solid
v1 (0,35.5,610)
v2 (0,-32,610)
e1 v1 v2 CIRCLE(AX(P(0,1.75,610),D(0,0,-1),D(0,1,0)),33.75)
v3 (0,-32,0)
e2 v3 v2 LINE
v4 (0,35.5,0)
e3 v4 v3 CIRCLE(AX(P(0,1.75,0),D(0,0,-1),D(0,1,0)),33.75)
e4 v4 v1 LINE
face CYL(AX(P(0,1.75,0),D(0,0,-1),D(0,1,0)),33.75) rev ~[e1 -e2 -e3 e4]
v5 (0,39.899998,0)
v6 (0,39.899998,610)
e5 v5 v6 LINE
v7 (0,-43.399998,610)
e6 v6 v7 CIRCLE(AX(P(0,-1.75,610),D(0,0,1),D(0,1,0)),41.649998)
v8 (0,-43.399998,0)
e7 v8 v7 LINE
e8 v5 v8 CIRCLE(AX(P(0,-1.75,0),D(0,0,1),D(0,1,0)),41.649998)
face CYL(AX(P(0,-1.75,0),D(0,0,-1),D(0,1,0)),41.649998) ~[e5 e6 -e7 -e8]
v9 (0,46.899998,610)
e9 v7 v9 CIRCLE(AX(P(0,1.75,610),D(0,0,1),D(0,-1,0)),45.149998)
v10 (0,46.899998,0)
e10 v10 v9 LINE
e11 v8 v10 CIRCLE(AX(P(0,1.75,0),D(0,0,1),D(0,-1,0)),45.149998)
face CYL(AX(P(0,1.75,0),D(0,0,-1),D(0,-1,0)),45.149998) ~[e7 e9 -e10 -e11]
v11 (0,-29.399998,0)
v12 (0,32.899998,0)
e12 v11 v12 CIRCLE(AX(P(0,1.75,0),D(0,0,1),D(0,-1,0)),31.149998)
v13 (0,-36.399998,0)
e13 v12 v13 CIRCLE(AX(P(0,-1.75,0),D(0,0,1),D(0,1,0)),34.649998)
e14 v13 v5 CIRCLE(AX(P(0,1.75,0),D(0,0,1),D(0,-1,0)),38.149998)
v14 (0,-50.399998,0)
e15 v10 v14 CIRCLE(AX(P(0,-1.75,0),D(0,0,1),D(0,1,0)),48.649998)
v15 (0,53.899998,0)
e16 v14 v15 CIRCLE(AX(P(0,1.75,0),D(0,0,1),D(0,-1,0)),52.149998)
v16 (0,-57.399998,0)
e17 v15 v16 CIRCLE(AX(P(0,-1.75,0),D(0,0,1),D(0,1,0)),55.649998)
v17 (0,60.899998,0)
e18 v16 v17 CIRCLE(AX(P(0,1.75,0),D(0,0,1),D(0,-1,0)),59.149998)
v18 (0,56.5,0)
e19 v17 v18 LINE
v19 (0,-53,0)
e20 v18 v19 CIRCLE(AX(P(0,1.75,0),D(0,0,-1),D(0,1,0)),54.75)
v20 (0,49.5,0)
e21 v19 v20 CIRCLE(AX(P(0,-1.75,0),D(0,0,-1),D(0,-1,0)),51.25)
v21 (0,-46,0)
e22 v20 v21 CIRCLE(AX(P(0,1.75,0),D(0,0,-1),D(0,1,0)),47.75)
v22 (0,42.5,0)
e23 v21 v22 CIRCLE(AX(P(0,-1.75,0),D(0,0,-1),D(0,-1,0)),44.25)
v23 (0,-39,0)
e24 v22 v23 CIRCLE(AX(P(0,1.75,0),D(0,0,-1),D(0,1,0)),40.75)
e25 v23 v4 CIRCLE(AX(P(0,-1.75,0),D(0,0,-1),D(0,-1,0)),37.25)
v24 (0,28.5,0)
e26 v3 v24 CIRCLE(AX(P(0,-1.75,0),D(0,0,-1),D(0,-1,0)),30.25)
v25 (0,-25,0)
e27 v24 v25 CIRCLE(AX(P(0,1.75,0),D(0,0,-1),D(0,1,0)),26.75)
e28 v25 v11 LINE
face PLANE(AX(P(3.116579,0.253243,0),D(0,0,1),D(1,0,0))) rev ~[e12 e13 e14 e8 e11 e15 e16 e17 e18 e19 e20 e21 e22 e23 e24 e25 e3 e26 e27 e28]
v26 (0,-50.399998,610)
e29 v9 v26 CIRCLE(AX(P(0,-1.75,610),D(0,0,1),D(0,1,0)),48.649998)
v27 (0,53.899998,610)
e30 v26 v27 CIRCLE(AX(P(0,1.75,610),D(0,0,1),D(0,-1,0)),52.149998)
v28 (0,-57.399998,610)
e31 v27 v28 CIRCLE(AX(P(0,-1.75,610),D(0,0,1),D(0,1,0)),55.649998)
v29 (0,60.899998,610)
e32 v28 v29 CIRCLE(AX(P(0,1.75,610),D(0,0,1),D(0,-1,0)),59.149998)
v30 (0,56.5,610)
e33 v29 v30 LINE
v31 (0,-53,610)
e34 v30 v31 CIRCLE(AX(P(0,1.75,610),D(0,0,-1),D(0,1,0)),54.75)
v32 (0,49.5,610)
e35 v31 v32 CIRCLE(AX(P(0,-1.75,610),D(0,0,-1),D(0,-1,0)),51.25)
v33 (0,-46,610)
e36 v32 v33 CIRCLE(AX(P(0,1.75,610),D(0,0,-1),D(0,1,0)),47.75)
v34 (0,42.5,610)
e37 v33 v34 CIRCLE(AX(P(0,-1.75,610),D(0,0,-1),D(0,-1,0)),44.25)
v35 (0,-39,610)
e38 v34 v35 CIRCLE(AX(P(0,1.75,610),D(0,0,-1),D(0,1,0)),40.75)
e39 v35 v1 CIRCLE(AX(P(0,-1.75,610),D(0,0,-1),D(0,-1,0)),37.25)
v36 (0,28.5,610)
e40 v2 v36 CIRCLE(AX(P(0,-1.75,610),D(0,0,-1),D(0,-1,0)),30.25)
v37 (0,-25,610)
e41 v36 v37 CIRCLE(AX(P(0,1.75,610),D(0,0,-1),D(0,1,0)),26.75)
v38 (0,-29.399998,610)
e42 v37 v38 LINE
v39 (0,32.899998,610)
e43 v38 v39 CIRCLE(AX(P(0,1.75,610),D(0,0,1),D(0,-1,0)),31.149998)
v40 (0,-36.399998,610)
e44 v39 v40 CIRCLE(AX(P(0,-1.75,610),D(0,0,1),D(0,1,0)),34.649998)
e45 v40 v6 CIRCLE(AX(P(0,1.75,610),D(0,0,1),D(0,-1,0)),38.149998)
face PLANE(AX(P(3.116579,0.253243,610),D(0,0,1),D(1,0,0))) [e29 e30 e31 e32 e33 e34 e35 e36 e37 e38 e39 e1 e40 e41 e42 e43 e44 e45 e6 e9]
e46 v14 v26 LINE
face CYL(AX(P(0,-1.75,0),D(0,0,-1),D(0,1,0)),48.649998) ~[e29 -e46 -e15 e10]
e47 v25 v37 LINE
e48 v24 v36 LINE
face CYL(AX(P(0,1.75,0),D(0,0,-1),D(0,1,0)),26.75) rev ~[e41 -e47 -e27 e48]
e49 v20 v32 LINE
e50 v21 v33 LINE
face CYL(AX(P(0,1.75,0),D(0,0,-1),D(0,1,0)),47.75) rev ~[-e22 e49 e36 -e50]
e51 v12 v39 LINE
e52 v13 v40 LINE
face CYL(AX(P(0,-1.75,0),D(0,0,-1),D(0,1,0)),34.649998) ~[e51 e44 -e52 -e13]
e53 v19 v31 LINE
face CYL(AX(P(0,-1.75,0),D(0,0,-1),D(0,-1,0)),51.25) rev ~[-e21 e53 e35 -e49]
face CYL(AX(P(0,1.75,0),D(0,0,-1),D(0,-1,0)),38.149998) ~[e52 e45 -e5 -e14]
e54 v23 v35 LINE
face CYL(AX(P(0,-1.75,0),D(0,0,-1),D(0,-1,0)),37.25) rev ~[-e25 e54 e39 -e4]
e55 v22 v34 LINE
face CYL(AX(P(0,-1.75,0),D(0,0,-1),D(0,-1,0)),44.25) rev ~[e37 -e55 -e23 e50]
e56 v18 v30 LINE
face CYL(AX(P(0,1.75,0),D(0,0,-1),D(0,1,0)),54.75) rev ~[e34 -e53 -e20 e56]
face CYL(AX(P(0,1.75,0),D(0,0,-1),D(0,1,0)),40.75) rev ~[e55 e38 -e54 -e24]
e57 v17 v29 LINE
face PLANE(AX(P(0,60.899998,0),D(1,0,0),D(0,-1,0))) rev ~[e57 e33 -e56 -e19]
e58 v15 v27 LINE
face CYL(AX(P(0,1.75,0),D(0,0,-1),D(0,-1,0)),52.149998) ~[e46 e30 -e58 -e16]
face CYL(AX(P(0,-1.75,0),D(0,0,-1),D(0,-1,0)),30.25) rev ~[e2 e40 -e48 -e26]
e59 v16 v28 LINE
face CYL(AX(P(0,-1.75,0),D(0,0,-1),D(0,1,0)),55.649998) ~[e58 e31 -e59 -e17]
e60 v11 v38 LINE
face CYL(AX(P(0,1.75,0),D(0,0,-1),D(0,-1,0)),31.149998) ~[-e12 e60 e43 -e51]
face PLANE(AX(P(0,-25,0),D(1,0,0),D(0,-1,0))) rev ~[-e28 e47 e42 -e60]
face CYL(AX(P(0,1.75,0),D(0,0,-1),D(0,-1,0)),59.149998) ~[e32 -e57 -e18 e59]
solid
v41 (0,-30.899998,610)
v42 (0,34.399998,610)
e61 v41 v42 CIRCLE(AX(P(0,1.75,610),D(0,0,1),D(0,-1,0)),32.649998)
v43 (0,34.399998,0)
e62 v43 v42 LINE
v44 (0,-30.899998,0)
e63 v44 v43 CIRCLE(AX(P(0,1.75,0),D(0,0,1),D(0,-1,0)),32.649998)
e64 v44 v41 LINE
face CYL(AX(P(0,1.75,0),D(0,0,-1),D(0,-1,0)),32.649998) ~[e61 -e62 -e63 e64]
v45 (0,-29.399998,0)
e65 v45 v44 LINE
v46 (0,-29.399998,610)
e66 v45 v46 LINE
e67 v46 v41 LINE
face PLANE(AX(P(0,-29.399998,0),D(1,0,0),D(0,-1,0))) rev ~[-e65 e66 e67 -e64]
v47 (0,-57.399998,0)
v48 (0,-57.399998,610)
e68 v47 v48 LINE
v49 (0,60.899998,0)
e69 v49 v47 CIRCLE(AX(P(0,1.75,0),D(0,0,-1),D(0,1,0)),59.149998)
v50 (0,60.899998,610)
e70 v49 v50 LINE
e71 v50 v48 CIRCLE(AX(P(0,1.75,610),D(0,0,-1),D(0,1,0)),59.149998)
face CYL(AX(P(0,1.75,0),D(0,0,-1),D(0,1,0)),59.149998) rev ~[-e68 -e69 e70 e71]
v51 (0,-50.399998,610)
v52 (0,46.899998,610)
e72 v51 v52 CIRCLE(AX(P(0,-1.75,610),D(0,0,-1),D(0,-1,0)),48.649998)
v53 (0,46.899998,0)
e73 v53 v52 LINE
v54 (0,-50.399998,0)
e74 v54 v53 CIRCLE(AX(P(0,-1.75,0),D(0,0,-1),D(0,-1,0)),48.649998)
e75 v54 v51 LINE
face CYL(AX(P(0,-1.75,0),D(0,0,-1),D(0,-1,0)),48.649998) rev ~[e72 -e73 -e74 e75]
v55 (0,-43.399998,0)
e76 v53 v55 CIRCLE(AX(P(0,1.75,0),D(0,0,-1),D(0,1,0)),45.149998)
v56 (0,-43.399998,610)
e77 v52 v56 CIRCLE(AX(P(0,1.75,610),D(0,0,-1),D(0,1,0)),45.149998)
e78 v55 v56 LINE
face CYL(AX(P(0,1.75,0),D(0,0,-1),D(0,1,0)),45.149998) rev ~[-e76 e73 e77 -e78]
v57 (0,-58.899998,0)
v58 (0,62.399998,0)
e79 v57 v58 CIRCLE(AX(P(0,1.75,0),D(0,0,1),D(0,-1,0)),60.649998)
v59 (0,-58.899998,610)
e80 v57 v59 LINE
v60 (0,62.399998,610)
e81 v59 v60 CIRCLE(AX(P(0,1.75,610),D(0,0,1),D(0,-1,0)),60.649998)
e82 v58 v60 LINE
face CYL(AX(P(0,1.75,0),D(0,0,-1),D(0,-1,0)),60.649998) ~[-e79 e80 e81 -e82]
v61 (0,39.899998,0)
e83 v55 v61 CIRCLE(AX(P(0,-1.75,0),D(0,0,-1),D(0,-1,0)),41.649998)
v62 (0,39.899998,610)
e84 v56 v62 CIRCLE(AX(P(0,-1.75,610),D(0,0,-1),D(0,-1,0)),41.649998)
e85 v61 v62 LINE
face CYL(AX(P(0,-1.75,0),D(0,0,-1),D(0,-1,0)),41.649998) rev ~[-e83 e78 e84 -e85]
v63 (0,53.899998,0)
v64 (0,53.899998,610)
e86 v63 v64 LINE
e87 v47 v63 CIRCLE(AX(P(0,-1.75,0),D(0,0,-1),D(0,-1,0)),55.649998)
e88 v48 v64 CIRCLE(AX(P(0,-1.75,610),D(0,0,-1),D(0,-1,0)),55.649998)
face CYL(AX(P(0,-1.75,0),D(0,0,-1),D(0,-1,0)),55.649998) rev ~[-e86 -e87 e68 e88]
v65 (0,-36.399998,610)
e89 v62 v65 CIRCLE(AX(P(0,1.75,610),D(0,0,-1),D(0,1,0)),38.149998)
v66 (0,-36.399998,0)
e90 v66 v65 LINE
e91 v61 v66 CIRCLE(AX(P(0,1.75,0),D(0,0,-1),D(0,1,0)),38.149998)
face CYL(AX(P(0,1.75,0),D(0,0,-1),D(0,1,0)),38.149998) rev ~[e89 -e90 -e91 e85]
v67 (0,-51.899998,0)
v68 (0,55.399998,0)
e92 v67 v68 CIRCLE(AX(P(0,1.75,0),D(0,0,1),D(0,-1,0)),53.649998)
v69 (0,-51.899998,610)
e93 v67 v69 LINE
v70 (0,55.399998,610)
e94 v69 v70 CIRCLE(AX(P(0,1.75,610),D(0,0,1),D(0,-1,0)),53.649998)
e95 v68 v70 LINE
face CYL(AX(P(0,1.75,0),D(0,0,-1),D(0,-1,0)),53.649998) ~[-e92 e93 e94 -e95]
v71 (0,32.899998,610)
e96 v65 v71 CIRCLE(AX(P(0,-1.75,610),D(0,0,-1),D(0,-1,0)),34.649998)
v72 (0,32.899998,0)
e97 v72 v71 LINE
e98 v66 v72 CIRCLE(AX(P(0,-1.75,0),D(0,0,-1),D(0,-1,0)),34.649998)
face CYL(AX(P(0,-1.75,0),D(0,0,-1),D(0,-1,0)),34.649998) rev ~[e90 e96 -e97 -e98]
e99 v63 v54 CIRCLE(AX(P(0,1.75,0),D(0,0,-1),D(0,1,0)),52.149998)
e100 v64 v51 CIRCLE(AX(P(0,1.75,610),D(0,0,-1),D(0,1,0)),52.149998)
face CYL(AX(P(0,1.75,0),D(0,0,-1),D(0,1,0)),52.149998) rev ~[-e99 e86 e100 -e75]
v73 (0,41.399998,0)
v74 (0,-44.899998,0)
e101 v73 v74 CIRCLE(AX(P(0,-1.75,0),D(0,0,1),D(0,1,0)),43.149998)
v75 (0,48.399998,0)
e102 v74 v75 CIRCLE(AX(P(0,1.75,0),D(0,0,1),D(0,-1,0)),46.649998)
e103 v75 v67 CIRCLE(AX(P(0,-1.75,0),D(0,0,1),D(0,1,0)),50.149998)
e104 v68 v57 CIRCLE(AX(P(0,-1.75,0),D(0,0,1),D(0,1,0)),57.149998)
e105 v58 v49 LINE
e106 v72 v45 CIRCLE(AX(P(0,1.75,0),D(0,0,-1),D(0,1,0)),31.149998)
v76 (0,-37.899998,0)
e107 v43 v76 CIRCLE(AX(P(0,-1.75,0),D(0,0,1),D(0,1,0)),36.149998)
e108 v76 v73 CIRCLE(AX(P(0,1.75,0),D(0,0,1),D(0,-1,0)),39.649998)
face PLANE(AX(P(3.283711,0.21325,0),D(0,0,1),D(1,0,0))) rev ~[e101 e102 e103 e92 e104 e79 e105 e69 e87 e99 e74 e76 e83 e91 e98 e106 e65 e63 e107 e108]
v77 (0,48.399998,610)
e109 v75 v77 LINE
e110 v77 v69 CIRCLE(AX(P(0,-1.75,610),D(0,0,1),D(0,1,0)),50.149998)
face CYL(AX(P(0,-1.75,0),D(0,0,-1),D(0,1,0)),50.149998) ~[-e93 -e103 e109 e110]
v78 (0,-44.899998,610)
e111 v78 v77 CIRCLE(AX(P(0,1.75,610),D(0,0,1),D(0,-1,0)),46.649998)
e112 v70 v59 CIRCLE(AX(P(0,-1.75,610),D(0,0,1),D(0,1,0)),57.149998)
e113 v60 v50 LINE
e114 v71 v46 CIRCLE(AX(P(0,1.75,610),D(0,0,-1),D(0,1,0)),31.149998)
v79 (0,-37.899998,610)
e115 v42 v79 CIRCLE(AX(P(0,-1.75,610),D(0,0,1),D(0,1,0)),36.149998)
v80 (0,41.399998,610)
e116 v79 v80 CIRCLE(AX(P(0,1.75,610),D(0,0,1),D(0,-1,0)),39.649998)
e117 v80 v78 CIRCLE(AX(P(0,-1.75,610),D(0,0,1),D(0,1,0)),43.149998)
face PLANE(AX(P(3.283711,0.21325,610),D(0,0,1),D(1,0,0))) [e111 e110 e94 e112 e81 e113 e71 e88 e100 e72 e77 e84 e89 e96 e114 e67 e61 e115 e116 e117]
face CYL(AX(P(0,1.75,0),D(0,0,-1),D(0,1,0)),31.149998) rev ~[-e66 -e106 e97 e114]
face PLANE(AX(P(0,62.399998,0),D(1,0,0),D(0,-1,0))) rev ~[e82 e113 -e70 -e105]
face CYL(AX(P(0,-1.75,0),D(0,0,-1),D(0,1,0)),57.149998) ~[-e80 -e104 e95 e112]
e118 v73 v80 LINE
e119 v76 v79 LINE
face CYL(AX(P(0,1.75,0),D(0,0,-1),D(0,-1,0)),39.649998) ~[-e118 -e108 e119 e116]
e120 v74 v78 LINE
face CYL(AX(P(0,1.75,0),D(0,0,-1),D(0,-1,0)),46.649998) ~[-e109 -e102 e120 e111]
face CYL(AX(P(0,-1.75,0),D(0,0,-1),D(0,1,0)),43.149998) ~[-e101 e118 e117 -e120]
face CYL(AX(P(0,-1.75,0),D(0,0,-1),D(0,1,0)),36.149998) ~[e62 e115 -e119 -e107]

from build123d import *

# Parameters (mm, degrees)
F1_DEPTH = 610
F3_DEPTH = 610


# Not quite as in the source:
# - a feature of the source that left no trace in its solid (it failed there, or was rolled back) is left out


with BuildPart() as f1:
    # F0 (on Top) → F1 (new body)
    with BuildSketch(Plane.XY):
        with BuildLine():
            ThreePointArc((0, 28.5), (26.75, 1.75), (0, -25))
            Line((0, -25), (0, -29.399998486))
            ThreePointArc((0, -29.399998486), (31.149998486, 1.75), (0, 32.899998486))
            ThreePointArc((0, 32.899998486), (-34.649998486, -1.75), (0, -36.399998486))
            ThreePointArc((0, -36.399998486), (38.149998486, 1.75), (0, 39.899998486))
            ThreePointArc((0, 39.899998486), (-41.649998486, -1.75), (0, -43.399998486))
            ThreePointArc((0, -43.399998486), (45.149998486, 1.75), (0, 46.899998486))
            ThreePointArc((0, 46.899998486), (-48.649998486, -1.75), (0, -50.399998486))
            ThreePointArc((0, -50.399998486), (52.149998486, 1.75), (0, 53.899998486))
            ThreePointArc((0, 53.899998486), (-55.649998486, -1.75), (0, -57.399998486))
            ThreePointArc((0, -57.399998486), (59.149998486, 1.75), (0, 60.899998486))
            Line((0, 60.899998486), (0, 56.5))
            ThreePointArc((0, 56.5), (54.75, 1.75), (0, -53))
            ThreePointArc((0, -53), (-51.25, -1.75), (0, 49.5))
            ThreePointArc((0, 49.5), (47.75, 1.75), (0, -46))
            ThreePointArc((0, -46), (-44.25, -1.75), (0, 42.5))
            ThreePointArc((0, 42.5), (40.75, 1.75), (0, -39))
            ThreePointArc((0, -39), (-37.25, -1.75), (0, 35.5))
            ThreePointArc((0, 35.5), (33.75, 1.75), (0, -32))
            ThreePointArc((0, -32), (-30.25, -1.75), (0, 28.5))
        make_face()
    extrude(amount=F1_DEPTH)


with BuildPart() as f3:
    # F0 (on Top) → F3 (new body, through all)
    with BuildSketch(Plane.XY):
        with BuildLine():
            ThreePointArc((0, 32.899998486), (31.149998486, 1.75), (0, -29.399998486))
            Line((0, -29.399998486), (0, -30.899998486))
            ThreePointArc((0, -30.899998486), (32.649998486, 1.75), (0, 34.399998486))
            ThreePointArc((0, 34.399998486), (-36.149998486, -1.75), (0, -37.899998486))
            ThreePointArc((0, -37.899998486), (39.649998486, 1.75), (0, 41.399998486))
            ThreePointArc((0, 41.399998486), (-43.149998486, -1.75), (0, -44.899998486))
            ThreePointArc((0, -44.899998486), (46.649998486, 1.75), (0, 48.399998486))
            ThreePointArc((0, 48.399998486), (-50.149998486, -1.75), (0, -51.899998486))
            ThreePointArc((0, -51.899998486), (53.649998486, 1.75), (0, 55.399998486))
            ThreePointArc((0, 55.399998486), (-57.149998486, -1.75), (0, -58.899998486))
            ThreePointArc((0, -58.899998486), (60.649998486, 1.75), (0, 62.399998486))
            Line((0, 62.399998486), (0, 60.899998486))
            ThreePointArc((0, 60.899998486), (59.149998486, 1.75), (0, -57.399998486))
            ThreePointArc((0, -57.399998486), (-55.649998486, -1.75), (0, 53.899998486))
            ThreePointArc((0, 53.899998486), (52.149998486, 1.75), (0, -50.399998486))
            ThreePointArc((0, -50.399998486), (-48.649998486, -1.75), (0, 46.899998486))
            ThreePointArc((0, 46.899998486), (45.149998486, 1.75), (0, -43.399998486))
            ThreePointArc((0, -43.399998486), (-41.649998486, -1.75), (0, 39.899998486))
            ThreePointArc((0, 39.899998486), (38.149998486, 1.75), (0, -36.399998486))
            ThreePointArc((0, -36.399998486), (-34.649998486, -1.75), (0, 32.899998486))
        make_face()
    extrude(amount=F3_DEPTH)


solid = Compound([f1.part, f3.part])
